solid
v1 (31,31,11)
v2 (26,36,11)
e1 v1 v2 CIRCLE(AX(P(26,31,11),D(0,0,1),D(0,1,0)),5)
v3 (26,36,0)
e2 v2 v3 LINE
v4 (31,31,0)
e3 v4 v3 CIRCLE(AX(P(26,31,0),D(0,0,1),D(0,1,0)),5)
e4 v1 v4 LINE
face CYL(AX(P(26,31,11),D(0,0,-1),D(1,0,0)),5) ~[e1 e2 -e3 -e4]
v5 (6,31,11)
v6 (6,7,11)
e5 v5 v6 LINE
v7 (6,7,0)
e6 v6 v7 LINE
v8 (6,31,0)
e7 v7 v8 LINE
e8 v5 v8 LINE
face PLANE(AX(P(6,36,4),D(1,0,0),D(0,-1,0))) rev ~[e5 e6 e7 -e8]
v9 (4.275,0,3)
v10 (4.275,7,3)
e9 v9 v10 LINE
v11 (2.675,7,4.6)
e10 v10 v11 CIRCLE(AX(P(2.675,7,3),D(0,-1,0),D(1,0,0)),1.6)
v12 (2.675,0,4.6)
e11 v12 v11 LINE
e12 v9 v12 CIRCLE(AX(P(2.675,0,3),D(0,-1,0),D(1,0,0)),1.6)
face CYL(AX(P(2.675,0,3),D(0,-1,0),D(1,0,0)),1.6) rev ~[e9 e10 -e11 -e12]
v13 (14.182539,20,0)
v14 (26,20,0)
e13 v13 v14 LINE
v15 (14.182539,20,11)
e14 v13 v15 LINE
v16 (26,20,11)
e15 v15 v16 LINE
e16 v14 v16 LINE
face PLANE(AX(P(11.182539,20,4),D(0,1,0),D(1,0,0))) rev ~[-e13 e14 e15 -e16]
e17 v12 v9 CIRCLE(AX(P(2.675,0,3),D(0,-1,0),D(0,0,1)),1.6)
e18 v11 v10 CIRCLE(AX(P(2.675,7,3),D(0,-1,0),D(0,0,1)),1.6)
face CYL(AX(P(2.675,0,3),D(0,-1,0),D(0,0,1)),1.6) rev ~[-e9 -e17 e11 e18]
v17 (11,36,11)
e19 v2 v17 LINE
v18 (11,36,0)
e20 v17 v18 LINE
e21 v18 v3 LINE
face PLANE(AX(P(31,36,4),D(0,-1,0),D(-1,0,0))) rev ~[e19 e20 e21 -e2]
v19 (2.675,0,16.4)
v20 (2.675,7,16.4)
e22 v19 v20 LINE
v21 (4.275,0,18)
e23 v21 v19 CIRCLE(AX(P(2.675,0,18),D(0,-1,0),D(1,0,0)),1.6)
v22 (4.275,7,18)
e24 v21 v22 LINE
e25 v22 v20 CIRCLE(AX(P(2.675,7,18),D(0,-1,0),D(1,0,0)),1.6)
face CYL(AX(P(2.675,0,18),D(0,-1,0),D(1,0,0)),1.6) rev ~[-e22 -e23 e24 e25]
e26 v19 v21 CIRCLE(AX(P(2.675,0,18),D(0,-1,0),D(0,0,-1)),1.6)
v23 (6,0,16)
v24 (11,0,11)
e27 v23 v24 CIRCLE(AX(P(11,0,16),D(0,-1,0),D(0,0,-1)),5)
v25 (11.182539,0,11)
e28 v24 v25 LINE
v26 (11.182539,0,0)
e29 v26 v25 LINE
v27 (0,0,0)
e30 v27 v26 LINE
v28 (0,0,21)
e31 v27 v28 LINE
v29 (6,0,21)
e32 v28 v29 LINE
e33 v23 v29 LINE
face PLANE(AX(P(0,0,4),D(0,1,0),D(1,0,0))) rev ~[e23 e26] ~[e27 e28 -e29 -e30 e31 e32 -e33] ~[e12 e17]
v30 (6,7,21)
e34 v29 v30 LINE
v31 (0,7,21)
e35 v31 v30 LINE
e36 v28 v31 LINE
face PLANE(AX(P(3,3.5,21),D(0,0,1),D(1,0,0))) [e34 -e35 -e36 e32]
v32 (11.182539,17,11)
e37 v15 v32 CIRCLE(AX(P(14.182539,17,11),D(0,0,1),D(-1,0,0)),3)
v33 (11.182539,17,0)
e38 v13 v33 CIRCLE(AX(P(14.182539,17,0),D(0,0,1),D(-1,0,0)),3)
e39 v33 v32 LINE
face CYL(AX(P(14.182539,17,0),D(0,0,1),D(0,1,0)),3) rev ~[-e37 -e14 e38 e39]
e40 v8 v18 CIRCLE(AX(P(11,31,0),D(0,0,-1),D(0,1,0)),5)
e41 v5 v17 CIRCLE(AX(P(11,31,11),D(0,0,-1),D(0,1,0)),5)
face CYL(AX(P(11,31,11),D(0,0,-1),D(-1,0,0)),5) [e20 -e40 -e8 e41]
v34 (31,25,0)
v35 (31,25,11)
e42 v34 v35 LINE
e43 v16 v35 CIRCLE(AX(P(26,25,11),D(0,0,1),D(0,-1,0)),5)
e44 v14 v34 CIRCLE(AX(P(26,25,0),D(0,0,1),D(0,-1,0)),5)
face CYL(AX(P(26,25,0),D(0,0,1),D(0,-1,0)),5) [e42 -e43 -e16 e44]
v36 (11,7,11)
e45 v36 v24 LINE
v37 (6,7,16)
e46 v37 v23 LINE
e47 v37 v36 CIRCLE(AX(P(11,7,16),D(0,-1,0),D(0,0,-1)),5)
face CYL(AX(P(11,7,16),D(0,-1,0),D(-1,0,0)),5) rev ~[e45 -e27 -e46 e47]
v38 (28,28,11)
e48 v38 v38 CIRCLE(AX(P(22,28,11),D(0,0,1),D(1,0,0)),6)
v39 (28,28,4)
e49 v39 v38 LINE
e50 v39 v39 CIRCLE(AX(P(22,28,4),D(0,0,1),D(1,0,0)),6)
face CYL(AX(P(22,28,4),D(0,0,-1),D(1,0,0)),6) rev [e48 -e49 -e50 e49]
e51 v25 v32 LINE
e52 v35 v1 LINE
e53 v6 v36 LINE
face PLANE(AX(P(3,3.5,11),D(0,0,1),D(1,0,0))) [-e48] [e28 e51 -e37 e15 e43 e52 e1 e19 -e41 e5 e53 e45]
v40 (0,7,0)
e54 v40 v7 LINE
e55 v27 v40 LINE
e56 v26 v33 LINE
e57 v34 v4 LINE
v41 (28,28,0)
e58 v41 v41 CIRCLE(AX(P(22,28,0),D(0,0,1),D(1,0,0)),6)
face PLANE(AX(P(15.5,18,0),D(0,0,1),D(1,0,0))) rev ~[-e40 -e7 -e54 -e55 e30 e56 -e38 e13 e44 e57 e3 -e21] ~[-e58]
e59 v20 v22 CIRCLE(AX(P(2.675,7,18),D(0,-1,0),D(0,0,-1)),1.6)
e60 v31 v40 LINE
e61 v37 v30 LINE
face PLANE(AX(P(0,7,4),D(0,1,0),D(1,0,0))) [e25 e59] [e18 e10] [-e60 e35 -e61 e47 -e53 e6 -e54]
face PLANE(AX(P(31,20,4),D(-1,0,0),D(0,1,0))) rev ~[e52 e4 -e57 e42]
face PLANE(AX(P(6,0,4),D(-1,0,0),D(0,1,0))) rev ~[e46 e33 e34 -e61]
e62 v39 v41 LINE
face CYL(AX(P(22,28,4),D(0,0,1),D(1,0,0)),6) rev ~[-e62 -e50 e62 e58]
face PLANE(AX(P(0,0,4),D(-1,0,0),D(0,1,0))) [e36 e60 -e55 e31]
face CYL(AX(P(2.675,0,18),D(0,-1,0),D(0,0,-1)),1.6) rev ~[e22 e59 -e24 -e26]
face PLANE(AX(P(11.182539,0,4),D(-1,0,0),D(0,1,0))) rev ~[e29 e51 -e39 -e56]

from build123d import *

# Parameters (mm, degrees)
F0_W     = 31
F0_H     = 36
F1_DEPTH = 4
F2_R     = 6
F2_W     = 6
F2_H     = 29
F2_W_2   = 19.817460835
F2_H_2   = 20
F3_DEPTH = 25
F4_W     = 6
F4_H     = 7
F4_R     = 6
F5_DEPTH = 7
F6_DEPTH = 17
F8_DEPTH = 25
F9_F1_R  = 5
F9_F2_R  = 5
F10_R    = 3


# Not quite as in the source:
# - two fillets or chamfers of one size are made in one step


with BuildPart() as f1:
    # F0 (on Top) → F1 (new body)
    with BuildSketch(Plane.XY):
        with Locations((15.5, 18)):
            Rectangle(F0_W, F0_H)
    extrude(amount=F1_DEPTH)

    # F2 (on face) → F3 (cut)
    with BuildSketch(Plane.XY.offset(4)):
        with Locations((22, 28)):
            Circle(F2_R)
        with Locations((3, 21.5)):
            Rectangle(F2_W, F2_H)
        with Locations((21.0912695825, 10)):
            Rectangle(F2_W_2, F2_H_2)
    extrude(amount=-F3_DEPTH, mode=Mode.SUBTRACT)

    # F4 (on face) → F5 (join)
    with BuildSketch(Plane.XY.offset(4)):
        with Locations((3, 3.5)):
            Rectangle(F4_W, F4_H)
        Polygon((6, 36), (6, 7), (6, 0), (11.182539165, 0), (11.182539165, 20), (31, 20), (31, 36), align=None)
        with Locations((22, 28)):
            Circle(F4_R, mode=Mode.SUBTRACT)
    extrude(amount=F5_DEPTH)

    # F4 (on face) → F6 (join)
    with BuildSketch(Plane.XY.offset(4)):
        with Locations((3, 3.5)):
            Rectangle(F4_W, F4_H)
    extrude(amount=F6_DEPTH)

    # F7 (on face) → F8 (cut)
    with BuildSketch(Plane.XZ):
        with BuildLine():
            ThreePointArc((4.275, 3), (3.8063708499, 4.1313708499), (2.675, 4.6))
            ThreePointArc((2.675, 4.6), (1.5436291501, 1.8686291501), (4.275, 3))
        make_face()
        with BuildLine():
            ThreePointArc((4.275, 18), (1.5436291501, 19.1313708499), (2.675, 16.4))
            ThreePointArc((2.675, 16.4), (3.8063708499, 16.8686291501), (4.275, 18))
        make_face()
    extrude(amount=-F8_DEPTH, mode=Mode.SUBTRACT)

    # F9: fillet of radius 5 on 4 edges, made by hand

    # F9_f1
    f9_f1_edges = [f1.edges().sort_by_distance(p)[0] for p in [
        (6, 3.5, 11),
    ]]
    fillet(f9_f1_edges, radius=F9_F1_R)

    # F9_f2
    f9_f2_edges = [f1.edges().sort_by_distance(p)[0] for p in [
        (31, 36, 5.5),
        (6, 36, 5.5),
        (31, 20, 5.5),
    ]]
    fillet(f9_f2_edges, radius=F9_F2_R)

    # F10
    f10_edges = [f1.edges().sort_by_distance(p)[0] for p in [
        (11.182539, 20, 5.5),
    ]]
    fillet(f10_edges, radius=F10_R)


solid = f1.part
